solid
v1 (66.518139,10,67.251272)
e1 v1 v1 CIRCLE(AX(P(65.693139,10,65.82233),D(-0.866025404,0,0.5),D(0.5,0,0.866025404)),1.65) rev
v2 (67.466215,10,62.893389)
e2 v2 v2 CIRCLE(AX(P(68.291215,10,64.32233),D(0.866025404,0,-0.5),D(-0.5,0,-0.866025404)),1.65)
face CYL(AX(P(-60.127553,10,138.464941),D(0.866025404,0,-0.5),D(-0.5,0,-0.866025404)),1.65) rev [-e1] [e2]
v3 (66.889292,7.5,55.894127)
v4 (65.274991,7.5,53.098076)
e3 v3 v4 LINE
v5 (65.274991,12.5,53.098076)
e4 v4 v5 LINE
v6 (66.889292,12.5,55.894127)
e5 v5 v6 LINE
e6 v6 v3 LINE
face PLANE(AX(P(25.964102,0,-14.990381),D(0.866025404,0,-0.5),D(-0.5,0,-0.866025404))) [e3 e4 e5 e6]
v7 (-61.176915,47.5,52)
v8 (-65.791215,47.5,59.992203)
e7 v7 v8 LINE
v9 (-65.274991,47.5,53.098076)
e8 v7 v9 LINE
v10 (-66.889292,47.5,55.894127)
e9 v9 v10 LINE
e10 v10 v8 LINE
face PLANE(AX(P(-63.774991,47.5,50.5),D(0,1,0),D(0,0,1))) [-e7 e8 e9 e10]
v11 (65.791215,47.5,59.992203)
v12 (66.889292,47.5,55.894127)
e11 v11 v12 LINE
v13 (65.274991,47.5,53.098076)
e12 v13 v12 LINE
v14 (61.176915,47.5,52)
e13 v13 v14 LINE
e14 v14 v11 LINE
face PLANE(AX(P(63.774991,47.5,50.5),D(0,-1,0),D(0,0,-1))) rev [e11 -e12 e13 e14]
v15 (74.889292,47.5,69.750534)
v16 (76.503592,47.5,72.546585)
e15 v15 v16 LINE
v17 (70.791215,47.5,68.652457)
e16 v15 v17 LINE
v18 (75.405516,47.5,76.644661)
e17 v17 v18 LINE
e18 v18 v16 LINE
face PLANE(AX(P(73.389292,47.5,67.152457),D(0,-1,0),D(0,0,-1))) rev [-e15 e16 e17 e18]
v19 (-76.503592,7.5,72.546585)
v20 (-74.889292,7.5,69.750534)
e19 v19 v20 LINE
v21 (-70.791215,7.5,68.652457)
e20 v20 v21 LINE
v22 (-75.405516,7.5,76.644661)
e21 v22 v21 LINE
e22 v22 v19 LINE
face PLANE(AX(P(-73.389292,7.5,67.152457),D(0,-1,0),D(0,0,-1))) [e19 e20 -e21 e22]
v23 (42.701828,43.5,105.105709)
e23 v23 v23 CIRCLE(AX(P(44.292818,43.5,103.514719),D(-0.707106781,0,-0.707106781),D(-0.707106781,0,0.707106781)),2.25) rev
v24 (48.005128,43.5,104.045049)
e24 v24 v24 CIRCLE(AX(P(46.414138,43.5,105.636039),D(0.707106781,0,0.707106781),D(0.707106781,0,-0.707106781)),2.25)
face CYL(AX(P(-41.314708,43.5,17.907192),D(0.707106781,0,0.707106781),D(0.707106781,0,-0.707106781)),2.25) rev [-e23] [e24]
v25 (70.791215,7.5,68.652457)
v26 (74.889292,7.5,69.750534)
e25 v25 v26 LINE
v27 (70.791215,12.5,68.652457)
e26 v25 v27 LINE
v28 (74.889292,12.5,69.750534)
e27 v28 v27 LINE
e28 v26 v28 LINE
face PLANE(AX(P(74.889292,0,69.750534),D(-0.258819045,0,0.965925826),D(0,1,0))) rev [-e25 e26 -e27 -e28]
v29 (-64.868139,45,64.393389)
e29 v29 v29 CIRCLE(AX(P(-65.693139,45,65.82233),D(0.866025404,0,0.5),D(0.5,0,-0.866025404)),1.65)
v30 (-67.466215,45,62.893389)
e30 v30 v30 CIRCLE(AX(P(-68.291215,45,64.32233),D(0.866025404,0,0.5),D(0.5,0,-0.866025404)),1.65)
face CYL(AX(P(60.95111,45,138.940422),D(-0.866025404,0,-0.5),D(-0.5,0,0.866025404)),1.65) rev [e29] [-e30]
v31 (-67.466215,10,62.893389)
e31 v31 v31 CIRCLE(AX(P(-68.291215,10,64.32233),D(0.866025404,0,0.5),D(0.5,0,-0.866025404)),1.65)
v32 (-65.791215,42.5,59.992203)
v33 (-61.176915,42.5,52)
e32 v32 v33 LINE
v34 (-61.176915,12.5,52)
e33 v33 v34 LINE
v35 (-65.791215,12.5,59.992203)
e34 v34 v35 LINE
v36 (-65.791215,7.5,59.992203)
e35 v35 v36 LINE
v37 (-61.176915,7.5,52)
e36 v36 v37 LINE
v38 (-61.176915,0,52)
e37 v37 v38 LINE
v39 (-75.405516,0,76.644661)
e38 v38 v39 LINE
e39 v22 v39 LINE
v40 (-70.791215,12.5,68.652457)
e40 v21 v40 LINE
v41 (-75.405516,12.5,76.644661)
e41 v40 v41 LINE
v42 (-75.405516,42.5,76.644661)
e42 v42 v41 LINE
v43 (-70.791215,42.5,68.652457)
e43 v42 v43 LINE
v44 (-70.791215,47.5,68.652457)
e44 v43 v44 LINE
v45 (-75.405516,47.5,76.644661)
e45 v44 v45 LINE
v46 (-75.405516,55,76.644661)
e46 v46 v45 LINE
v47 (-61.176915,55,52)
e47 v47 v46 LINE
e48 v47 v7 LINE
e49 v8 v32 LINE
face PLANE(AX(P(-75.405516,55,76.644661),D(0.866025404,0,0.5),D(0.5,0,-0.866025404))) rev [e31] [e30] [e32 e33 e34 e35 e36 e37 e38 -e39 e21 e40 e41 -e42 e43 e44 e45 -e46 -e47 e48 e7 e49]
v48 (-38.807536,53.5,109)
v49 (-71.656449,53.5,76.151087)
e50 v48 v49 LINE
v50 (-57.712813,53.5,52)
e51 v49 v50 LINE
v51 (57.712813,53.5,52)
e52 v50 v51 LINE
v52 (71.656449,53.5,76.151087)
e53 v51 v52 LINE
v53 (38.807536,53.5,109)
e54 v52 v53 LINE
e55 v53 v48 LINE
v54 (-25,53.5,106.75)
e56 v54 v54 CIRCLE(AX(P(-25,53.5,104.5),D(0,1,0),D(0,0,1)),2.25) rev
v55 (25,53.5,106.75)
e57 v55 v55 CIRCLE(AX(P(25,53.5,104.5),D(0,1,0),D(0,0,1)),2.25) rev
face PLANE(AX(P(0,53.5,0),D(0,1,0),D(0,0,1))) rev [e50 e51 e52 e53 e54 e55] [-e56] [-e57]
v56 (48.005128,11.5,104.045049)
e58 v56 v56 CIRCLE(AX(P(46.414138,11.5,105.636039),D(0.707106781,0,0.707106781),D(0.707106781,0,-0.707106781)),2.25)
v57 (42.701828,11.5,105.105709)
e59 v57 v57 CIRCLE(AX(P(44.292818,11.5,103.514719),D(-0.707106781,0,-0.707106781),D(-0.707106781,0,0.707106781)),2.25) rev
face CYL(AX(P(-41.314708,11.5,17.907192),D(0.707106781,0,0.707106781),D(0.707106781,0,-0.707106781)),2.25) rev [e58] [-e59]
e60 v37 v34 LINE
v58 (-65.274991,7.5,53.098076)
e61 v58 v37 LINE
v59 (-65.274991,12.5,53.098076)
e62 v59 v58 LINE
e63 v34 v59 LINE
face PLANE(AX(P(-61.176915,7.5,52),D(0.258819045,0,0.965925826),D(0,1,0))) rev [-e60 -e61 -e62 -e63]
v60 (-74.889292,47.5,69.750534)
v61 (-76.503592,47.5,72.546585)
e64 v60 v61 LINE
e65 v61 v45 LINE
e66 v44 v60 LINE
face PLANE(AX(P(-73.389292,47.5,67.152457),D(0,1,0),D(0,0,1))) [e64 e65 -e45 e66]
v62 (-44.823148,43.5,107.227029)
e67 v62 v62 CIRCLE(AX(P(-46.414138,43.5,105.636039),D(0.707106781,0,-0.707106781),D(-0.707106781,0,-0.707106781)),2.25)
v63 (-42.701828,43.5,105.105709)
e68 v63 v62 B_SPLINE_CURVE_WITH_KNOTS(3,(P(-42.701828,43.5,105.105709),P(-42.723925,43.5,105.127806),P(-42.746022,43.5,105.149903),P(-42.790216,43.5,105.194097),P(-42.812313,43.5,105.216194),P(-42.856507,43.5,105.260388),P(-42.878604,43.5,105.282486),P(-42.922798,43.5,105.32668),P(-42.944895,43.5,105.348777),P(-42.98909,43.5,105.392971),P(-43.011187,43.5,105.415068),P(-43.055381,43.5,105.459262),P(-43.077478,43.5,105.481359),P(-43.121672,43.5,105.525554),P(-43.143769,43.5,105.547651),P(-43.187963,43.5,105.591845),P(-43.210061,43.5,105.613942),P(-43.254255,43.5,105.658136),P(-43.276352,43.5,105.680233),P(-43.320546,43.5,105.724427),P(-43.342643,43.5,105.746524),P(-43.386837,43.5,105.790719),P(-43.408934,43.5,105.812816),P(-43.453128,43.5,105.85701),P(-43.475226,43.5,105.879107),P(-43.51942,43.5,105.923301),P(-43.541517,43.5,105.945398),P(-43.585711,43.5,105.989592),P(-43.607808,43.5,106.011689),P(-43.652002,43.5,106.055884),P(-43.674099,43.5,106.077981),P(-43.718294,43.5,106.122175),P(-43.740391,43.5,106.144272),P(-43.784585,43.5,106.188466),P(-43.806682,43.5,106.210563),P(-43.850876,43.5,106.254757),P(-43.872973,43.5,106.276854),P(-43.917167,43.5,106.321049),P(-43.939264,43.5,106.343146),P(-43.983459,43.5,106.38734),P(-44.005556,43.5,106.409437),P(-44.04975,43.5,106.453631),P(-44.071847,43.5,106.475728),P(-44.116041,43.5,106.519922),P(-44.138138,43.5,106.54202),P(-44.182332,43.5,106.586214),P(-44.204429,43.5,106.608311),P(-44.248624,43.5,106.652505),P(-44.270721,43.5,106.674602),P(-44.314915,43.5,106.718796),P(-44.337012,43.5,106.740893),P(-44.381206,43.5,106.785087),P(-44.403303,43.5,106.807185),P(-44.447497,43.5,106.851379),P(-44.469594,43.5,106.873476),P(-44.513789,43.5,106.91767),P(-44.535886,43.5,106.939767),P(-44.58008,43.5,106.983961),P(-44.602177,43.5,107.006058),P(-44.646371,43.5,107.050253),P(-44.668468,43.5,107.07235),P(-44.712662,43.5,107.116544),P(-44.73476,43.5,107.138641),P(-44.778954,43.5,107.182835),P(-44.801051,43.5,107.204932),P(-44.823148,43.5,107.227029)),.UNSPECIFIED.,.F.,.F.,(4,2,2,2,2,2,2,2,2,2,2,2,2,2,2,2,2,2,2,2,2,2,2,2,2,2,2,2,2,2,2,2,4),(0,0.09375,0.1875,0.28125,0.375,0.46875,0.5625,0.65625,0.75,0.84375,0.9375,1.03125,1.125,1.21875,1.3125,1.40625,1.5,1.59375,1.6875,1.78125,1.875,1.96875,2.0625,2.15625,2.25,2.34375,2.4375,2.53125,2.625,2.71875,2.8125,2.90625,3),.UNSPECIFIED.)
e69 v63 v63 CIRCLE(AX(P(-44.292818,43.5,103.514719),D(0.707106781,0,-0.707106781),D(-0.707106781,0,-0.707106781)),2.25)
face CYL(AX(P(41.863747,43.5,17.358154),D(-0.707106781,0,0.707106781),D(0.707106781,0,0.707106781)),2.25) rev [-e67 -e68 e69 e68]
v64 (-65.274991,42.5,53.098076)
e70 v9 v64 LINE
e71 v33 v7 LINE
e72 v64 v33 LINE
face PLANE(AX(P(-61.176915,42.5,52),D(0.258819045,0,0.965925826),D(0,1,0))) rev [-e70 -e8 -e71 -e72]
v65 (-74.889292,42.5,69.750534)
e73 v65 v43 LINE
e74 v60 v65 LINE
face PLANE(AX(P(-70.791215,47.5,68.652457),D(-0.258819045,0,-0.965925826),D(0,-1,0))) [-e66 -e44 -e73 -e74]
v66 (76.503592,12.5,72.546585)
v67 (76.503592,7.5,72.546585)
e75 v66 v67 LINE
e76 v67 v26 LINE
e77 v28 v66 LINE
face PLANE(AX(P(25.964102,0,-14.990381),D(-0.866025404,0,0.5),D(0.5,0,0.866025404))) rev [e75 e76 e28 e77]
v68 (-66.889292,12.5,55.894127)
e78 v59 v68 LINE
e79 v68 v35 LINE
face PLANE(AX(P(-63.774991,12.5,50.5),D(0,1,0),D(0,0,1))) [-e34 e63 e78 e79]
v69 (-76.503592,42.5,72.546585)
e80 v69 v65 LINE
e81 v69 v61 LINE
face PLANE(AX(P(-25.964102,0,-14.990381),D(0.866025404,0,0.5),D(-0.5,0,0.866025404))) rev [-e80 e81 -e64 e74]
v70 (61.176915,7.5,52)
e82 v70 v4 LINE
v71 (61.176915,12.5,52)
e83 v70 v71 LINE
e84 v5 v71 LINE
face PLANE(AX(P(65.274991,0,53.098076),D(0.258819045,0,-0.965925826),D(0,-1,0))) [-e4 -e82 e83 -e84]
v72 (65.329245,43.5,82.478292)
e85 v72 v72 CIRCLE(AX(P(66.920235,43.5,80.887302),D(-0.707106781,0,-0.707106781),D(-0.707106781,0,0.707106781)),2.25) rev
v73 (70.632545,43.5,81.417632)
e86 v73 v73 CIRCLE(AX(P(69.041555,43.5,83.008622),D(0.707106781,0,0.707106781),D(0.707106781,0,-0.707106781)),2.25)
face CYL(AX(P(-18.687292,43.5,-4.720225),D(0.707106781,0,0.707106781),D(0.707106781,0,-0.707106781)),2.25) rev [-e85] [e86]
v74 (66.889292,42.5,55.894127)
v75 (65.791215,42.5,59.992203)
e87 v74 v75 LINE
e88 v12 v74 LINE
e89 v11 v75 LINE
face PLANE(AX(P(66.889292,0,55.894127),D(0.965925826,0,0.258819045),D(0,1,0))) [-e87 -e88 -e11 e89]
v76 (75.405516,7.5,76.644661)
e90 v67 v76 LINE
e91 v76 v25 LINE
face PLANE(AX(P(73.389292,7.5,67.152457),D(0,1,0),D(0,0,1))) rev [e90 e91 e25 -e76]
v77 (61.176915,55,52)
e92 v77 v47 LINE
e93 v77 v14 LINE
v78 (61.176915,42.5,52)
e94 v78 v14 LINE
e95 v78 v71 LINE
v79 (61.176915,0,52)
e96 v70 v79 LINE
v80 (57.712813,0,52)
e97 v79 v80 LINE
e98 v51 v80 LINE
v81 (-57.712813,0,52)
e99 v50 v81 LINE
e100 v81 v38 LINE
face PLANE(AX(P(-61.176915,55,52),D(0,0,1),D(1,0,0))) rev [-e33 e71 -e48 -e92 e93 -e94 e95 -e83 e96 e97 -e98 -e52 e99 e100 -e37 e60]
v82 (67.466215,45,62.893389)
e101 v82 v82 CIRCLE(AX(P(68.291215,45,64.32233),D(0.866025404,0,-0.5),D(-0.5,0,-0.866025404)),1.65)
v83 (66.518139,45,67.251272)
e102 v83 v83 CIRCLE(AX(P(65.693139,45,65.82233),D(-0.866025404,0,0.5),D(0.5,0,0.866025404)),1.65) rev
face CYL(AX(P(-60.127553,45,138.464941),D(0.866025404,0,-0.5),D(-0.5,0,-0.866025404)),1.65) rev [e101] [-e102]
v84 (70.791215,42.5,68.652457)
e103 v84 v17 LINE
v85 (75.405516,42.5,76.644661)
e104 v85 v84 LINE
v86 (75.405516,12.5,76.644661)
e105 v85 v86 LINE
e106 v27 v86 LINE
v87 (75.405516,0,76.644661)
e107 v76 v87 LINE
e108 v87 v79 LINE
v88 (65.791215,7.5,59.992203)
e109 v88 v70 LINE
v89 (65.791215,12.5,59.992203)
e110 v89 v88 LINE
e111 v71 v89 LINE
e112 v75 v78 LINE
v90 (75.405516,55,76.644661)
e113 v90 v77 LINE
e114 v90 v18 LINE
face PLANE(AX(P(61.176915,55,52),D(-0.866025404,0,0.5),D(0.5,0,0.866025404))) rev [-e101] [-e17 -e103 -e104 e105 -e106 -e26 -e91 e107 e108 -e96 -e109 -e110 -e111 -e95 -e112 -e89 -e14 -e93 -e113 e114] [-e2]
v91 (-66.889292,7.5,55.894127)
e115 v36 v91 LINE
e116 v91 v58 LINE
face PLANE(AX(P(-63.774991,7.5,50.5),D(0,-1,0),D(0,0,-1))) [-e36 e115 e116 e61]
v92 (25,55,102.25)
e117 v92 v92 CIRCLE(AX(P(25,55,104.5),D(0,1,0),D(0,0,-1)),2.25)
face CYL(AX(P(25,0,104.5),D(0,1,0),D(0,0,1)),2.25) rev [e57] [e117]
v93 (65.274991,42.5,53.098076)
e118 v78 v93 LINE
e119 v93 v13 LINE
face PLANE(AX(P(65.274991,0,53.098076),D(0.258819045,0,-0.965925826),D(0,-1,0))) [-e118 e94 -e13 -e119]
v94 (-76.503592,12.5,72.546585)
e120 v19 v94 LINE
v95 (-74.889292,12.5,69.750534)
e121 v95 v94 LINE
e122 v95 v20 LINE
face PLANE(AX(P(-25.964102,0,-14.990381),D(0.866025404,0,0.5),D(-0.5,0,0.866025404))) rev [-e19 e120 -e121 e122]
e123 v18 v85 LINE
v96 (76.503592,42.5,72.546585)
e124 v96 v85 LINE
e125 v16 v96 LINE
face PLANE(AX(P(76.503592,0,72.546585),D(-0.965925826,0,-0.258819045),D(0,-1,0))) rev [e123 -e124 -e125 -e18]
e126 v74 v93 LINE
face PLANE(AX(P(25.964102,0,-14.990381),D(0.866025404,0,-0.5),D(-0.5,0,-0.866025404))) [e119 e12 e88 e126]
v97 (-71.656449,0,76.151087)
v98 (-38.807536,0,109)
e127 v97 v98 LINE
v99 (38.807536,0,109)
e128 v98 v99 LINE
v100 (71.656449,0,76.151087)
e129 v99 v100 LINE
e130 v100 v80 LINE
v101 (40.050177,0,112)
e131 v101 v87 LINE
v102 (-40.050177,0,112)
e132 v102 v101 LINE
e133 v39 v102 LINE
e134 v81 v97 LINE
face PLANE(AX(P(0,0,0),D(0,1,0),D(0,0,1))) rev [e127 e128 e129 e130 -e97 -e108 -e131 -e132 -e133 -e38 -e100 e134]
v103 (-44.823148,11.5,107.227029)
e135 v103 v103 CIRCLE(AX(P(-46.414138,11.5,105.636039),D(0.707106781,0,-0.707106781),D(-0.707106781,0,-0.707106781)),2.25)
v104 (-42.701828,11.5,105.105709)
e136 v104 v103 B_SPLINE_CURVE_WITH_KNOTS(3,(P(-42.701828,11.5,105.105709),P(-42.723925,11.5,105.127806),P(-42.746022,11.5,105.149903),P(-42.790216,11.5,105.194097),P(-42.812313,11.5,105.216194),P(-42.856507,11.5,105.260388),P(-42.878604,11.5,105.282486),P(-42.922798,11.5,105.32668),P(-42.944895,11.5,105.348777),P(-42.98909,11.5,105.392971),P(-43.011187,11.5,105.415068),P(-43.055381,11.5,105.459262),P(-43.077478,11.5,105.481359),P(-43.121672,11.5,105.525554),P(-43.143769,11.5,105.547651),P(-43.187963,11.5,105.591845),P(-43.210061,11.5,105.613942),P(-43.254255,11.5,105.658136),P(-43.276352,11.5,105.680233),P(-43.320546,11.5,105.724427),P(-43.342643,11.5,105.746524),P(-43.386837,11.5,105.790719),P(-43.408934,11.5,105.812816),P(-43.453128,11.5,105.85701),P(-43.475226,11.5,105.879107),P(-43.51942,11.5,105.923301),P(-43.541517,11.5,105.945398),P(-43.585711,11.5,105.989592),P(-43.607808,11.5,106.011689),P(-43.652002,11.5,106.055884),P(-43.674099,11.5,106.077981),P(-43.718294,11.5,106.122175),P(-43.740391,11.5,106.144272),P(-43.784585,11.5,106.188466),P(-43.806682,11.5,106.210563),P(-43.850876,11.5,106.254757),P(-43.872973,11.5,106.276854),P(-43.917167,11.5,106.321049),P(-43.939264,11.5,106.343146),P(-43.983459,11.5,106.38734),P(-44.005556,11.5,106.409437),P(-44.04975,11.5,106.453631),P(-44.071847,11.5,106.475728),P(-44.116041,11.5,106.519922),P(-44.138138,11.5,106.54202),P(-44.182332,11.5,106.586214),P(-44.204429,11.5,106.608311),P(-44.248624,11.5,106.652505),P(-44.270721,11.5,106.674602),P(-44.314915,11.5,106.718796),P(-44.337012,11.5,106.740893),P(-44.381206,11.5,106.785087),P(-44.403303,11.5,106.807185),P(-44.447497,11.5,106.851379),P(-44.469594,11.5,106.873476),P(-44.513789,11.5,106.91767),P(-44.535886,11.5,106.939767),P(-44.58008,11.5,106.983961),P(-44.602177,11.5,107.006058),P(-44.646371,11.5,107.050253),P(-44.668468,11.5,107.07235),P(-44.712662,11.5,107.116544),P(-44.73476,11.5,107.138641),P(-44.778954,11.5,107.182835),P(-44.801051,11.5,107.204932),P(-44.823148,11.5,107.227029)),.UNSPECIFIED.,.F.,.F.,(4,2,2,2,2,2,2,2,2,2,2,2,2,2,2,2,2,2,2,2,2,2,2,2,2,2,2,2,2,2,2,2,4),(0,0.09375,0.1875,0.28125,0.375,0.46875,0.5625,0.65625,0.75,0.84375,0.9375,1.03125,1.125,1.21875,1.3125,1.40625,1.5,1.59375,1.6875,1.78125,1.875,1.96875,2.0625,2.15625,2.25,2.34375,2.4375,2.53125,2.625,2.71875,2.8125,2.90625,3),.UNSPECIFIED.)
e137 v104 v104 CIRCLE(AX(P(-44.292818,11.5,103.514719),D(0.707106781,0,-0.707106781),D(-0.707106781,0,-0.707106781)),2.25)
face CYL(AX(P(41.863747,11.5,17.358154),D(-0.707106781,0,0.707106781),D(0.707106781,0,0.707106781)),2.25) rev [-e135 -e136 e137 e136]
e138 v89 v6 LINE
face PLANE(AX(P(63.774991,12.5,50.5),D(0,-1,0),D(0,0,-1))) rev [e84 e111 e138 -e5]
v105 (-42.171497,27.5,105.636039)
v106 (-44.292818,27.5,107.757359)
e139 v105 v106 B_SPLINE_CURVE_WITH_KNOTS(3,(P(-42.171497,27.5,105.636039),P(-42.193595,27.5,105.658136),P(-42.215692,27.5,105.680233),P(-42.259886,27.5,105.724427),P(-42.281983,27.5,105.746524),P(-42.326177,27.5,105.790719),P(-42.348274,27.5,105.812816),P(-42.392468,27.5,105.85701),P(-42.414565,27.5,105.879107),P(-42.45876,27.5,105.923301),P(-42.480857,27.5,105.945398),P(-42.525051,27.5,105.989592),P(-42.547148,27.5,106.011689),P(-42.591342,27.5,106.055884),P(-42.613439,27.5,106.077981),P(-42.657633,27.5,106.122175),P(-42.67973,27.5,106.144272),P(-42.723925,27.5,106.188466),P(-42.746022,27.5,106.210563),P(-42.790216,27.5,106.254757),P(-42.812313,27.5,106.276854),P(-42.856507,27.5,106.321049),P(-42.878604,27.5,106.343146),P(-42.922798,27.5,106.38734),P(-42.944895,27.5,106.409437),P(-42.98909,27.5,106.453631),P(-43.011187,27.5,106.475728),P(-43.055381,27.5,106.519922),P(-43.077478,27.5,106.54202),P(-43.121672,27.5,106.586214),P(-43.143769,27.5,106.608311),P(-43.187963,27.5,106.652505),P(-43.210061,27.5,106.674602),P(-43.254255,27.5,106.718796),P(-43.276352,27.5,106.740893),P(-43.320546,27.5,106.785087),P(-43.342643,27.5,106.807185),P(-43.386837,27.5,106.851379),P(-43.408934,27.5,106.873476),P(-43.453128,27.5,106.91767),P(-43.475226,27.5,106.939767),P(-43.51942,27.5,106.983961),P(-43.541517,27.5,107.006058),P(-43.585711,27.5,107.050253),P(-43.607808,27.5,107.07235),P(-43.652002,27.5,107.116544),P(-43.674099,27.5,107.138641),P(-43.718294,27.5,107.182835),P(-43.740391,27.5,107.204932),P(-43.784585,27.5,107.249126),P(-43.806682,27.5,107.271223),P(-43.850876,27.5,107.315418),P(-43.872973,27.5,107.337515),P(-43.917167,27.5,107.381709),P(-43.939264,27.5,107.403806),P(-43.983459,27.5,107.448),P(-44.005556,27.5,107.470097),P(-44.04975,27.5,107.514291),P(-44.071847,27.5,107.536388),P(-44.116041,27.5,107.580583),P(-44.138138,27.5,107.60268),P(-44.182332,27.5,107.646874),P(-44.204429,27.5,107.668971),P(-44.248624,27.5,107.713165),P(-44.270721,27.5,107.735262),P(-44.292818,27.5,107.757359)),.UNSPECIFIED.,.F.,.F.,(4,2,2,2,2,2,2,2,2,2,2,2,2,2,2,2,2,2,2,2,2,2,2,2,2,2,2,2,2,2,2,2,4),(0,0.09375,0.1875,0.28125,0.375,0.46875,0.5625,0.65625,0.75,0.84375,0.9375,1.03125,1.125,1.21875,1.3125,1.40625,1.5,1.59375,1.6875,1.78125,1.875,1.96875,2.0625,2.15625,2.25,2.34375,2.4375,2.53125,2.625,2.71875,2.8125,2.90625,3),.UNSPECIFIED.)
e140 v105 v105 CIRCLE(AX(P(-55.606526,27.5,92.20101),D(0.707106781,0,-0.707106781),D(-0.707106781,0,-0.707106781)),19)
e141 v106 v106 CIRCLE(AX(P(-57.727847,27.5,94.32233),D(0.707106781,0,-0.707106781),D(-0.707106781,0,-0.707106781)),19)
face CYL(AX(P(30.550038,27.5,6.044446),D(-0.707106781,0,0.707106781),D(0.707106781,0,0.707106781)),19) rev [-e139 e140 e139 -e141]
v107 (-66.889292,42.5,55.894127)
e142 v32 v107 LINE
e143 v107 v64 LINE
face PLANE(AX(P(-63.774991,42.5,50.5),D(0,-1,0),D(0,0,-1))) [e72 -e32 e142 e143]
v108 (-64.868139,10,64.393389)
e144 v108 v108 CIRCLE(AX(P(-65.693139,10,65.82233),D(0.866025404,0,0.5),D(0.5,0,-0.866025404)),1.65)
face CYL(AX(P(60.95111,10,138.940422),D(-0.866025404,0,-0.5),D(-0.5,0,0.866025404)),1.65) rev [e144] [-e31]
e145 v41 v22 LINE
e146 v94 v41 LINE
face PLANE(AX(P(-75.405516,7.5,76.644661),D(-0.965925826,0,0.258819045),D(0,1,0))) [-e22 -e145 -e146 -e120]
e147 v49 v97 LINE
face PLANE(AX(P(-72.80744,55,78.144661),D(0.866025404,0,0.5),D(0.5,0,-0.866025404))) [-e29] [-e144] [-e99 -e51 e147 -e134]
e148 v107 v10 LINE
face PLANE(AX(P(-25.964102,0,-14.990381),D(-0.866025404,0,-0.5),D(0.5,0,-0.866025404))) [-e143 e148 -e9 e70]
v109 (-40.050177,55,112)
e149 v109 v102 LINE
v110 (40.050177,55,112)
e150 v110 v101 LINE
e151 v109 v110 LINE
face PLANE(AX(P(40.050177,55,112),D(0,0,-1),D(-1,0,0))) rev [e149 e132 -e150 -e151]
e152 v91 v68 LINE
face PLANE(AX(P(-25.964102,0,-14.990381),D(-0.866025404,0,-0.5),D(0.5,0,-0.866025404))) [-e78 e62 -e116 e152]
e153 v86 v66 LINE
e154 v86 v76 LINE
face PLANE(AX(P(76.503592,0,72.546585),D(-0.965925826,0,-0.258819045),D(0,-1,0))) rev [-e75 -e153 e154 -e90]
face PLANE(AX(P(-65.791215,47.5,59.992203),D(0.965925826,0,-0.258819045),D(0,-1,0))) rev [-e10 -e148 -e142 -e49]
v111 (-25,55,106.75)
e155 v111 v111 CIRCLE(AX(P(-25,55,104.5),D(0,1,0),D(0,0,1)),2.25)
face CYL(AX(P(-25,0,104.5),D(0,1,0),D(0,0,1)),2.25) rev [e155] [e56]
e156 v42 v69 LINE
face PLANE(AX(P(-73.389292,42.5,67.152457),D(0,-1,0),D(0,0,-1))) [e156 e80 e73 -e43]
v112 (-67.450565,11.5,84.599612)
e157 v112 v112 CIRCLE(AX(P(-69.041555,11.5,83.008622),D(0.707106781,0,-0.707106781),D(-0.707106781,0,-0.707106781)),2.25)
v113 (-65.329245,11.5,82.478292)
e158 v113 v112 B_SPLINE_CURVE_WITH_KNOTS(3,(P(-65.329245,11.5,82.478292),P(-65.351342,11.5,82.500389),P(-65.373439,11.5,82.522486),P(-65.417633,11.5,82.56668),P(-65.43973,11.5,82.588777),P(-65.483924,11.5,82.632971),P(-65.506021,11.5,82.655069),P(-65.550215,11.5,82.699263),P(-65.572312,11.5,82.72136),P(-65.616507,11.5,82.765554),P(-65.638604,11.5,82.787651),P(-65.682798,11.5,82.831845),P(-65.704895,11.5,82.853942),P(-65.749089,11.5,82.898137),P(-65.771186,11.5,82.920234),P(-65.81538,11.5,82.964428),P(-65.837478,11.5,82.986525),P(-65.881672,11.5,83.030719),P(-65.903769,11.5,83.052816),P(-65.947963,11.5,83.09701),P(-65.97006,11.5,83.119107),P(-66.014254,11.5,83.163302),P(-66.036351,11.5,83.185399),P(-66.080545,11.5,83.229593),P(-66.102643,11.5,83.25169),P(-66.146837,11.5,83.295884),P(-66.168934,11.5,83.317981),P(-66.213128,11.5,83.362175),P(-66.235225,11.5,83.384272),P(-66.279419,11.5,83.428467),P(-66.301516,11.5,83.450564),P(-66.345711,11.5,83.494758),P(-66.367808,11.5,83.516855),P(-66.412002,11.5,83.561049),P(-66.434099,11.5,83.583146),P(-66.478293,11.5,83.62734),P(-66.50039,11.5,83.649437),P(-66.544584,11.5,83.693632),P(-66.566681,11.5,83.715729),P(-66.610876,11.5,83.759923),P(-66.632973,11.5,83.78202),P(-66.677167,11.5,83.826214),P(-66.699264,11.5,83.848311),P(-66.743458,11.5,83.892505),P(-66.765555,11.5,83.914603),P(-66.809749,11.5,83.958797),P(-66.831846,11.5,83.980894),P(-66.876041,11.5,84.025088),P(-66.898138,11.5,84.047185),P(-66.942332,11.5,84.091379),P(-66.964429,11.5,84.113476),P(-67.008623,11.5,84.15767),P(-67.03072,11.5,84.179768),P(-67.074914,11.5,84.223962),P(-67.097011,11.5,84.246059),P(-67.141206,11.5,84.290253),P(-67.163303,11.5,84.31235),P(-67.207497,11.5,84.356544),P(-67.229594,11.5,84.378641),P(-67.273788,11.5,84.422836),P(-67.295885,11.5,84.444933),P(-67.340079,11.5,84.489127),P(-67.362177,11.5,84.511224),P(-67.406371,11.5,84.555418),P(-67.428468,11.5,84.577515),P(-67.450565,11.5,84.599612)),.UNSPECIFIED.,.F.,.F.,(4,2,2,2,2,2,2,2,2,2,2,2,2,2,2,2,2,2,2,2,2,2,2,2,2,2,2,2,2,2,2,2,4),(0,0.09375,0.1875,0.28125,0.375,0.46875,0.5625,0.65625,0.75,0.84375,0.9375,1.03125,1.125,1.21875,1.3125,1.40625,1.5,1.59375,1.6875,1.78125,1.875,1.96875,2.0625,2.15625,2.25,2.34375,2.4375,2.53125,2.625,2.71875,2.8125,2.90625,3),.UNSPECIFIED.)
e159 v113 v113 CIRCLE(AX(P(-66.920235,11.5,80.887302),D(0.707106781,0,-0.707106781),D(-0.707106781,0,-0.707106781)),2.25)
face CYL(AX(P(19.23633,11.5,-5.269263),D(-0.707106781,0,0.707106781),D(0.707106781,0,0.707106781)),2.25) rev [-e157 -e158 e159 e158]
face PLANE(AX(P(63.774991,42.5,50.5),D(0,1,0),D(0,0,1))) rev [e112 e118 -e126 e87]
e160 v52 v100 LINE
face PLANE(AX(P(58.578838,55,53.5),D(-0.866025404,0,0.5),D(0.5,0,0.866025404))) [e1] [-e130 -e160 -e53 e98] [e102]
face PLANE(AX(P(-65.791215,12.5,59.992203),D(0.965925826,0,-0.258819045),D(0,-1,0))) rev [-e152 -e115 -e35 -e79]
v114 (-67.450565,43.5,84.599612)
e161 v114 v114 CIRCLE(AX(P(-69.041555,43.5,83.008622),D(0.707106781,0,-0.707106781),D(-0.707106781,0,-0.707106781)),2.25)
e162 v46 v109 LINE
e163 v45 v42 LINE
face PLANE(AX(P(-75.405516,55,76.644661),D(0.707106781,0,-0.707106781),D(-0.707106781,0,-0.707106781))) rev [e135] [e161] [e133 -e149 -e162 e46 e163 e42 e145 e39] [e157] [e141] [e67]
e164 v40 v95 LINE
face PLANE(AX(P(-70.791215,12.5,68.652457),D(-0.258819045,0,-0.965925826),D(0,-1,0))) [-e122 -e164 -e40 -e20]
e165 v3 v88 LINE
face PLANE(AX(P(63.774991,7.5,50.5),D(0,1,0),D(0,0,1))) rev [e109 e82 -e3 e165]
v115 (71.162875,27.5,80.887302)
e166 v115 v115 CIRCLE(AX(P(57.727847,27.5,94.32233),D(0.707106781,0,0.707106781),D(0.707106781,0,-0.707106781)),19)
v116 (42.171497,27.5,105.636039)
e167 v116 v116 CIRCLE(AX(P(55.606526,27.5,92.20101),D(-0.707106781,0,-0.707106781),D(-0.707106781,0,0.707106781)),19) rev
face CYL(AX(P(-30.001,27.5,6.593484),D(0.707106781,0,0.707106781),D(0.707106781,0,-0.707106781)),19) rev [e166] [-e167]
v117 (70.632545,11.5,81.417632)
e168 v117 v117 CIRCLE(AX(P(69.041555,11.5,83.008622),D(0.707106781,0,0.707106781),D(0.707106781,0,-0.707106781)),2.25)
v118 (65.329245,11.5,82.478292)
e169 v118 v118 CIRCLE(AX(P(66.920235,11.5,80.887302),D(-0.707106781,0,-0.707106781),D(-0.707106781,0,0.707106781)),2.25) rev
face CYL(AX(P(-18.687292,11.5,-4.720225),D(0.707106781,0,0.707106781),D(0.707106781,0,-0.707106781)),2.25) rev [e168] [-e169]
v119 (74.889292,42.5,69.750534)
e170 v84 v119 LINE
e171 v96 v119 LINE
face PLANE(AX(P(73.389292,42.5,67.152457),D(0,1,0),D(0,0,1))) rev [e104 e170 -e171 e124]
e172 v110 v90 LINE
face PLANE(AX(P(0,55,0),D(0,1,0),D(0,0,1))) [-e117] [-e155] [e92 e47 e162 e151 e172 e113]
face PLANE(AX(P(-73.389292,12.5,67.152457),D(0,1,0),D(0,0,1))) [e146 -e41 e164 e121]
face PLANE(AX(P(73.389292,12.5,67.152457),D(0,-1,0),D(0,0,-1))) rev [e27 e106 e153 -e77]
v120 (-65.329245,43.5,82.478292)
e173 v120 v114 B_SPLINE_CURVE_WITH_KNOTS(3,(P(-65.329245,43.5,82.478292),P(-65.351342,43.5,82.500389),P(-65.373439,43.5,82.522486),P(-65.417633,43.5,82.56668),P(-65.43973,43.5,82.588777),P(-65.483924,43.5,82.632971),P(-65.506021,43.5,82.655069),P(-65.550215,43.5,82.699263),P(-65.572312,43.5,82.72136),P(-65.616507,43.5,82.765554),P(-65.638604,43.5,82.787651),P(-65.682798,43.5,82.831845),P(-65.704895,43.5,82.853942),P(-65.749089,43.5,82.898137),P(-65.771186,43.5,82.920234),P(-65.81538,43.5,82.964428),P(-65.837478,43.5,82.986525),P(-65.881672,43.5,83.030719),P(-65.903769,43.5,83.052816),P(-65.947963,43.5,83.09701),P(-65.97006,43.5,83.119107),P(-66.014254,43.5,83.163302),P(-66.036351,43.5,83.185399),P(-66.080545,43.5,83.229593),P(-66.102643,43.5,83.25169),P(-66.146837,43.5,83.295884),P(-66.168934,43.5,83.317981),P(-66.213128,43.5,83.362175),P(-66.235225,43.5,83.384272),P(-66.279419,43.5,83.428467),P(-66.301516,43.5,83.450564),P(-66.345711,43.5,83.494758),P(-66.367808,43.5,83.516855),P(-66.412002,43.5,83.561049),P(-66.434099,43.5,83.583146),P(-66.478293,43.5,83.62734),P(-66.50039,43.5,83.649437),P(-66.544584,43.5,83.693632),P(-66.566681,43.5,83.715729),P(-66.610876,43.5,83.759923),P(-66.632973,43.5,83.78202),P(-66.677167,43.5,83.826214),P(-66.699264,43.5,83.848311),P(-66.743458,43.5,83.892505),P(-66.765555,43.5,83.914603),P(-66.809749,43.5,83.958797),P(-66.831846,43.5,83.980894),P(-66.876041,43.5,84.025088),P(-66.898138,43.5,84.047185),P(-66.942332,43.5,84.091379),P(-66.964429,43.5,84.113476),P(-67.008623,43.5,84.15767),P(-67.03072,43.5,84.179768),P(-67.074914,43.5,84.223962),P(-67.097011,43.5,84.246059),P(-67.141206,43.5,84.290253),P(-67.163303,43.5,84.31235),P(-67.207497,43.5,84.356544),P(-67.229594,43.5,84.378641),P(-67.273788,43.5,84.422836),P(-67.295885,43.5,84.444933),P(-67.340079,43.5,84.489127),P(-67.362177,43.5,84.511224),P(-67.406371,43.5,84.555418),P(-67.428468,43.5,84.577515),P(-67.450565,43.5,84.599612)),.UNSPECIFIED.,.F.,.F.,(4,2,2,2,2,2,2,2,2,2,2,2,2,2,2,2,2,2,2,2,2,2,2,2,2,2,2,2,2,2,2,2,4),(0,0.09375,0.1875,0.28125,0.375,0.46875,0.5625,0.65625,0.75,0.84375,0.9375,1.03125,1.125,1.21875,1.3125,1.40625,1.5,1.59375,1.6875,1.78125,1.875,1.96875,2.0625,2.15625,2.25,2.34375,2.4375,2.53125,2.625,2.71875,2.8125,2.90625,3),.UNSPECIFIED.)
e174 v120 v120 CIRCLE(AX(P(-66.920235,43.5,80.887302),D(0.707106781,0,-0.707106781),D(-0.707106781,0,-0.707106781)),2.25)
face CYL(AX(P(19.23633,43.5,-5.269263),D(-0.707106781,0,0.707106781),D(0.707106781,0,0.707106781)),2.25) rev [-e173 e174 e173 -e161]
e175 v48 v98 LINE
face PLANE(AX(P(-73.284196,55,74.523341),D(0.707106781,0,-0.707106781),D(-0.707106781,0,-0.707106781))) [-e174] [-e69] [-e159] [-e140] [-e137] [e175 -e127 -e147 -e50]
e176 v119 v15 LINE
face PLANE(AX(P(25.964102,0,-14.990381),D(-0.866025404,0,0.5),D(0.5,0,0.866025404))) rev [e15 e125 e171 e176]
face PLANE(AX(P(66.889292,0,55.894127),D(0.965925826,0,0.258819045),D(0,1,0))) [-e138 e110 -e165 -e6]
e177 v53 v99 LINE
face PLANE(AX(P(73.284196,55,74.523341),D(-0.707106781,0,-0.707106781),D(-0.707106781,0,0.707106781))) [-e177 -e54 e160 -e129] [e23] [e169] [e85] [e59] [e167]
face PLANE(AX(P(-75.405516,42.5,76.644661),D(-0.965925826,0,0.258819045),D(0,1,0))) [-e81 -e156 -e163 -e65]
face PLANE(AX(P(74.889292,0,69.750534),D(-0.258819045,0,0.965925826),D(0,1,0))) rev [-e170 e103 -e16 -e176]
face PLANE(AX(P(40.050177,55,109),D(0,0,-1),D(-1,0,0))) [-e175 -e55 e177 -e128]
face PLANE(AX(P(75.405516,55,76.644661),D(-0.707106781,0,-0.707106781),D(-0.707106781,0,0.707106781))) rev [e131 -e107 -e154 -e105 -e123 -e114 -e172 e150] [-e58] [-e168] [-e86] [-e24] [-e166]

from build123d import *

# Parameters (mm, degrees)
BOSS_EXTRUDE1_DEPTH      = 55
SHELL1_T                 = -3
CUT_EXTRUDE1_REACH       = 167.077
SKETCH2_R                = 19
SKETCH2_R_2              = 2.25
CUT_EXTRUDE2_REACH       = 170.904
SKETCH3_R                = 1.65
SKETCH4_W                = 9.228601628
SKETCH4_H                = 5
BOSS_EXTRUDE2_DEPTH      = 3
CHAMFER1_SIZE            = 3
CHAMFER1_OF_MIRROR2_SIZE = 3
SKETCH5_R                = 2.25
CUT_EXTRUDE3_DEPTH       = 147.36190521
CUT_EXTRUDE4_DEPTH       = 1.5


with BuildPart() as part:
    # Sketch1 → Boss-Extrude1 (new body)
    with BuildSketch(Plane(origin=(0, 0, 0), x_dir=(1, 0, 0), z_dir=(0, 1, 0))):
        Polygon((40.050177105, -112), (-40.050177105, -112), (-75.405516164, -76.644660941), (-61.176914536, -52), (61.176914536, -52), (75.405516164, -76.644660941), align=None)
    extrude(amount=BOSS_EXTRUDE1_DEPTH)

    # Shell1
    shell1_openings = [part.faces().sort_by_distance(p)[0] for p in [
        (0, 27.5, 52),
        (0, 0, 79.968655268),
    ]]
    offset(amount=SHELL1_T, openings=shell1_openings, kind=Kind.INTERSECTION)

    # Sketch2 → Cut-Extrude1 (cut, up to next)
    with BuildSketch(Plane(origin=(76.025088553, 0, 76.025088553), x_dir=(0.7071067811865462, 0, -0.7071067811865488), z_dir=(0.7071067811865488, 0, 0.7071067811865462)), mode=Mode.PRIVATE) as cut_extrude1_sk1:
        with Locations((-25.876207674, 27.5)):
            Circle(SKETCH2_R)
    cut_extrude1_tool1 = extrude(cut_extrude1_sk1.sketch, amount=-CUT_EXTRUDE1_REACH, mode=Mode.PRIVATE) & part.part
    # Sketch2 → Cut-Extrude1 (cut, up to next)
    with BuildSketch(Plane(origin=(76.025088553, 0, 76.025088553), x_dir=(0.7071067811865462, 0, -0.7071067811865488), z_dir=(0.7071067811865488, 0, 0.7071067811865462)), mode=Mode.PRIVATE) as cut_extrude1_sk2:
        with Locations((-41.876207674, 11.5)):
            Circle(SKETCH2_R_2)
    cut_extrude1_tool2 = extrude(cut_extrude1_sk2.sketch, amount=-CUT_EXTRUDE1_REACH, mode=Mode.PRIVATE) & part.part
    # Sketch2 → Cut-Extrude1 (cut, up to next)
    with BuildSketch(Plane(origin=(76.025088553, 0, 76.025088553), x_dir=(0.7071067811865462, 0, -0.7071067811865488), z_dir=(0.7071067811865488, 0, 0.7071067811865462)), mode=Mode.PRIVATE) as cut_extrude1_sk3:
        with Locations((-9.876207674, 11.5)):
            Circle(SKETCH2_R_2)
    cut_extrude1_tool3 = extrude(cut_extrude1_sk3.sketch, amount=-CUT_EXTRUDE1_REACH, mode=Mode.PRIVATE) & part.part
    # Sketch2 → Cut-Extrude1 (cut, up to next)
    with BuildSketch(Plane(origin=(76.025088553, 0, 76.025088553), x_dir=(0.7071067811865462, 0, -0.7071067811865488), z_dir=(0.7071067811865488, 0, 0.7071067811865462)), mode=Mode.PRIVATE) as cut_extrude1_sk4:
        with Locations((-9.876207674, 43.5)):
            Circle(SKETCH2_R_2)
    cut_extrude1_tool4 = extrude(cut_extrude1_sk4.sketch, amount=-CUT_EXTRUDE1_REACH, mode=Mode.PRIVATE) & part.part
    # Sketch2 → Cut-Extrude1 (cut, up to next)
    with BuildSketch(Plane(origin=(76.025088553, 0, 76.025088553), x_dir=(0.7071067811865462, 0, -0.7071067811865488), z_dir=(0.7071067811865488, 0, 0.7071067811865462)), mode=Mode.PRIVATE) as cut_extrude1_sk5:
        with Locations((-41.876207674, 43.5)):
            Circle(SKETCH2_R_2)
    cut_extrude1_tool5 = extrude(cut_extrude1_sk5.sketch, amount=-CUT_EXTRUDE1_REACH, mode=Mode.PRIVATE) & part.part
    cut_extrude1_1 = cut_extrude1_tool1.solids().sort_by_distance((57.727847, 27.5, 94.32233))[0]
    add(cut_extrude1_1, mode=Mode.SUBTRACT)
    cut_extrude1_2 = cut_extrude1_tool2.solids().sort_by_distance((46.414138, 11.5, 105.636039))[0]
    add(cut_extrude1_2, mode=Mode.SUBTRACT)
    cut_extrude1_3 = cut_extrude1_tool3.solids().sort_by_distance((69.041555, 11.5, 83.008622))[0]
    add(cut_extrude1_3, mode=Mode.SUBTRACT)
    cut_extrude1_4 = cut_extrude1_tool4.solids().sort_by_distance((69.041555, 43.5, 83.008622))[0]
    add(cut_extrude1_4, mode=Mode.SUBTRACT)
    cut_extrude1_5 = cut_extrude1_tool5.solids().sort_by_distance((46.414138, 43.5, 105.636039))[0]
    add(cut_extrude1_5, mode=Mode.SUBTRACT)
    cut_extrude1 = cut_extrude1_1 + cut_extrude1_2 + cut_extrude1_3 + cut_extrude1_4 + cut_extrude1_5  # Cut-Extrude1 as one shape, for the pattern or mirror that repeats it

    # Sketch3 → Cut-Extrude2 (cut, up to next)
    with BuildSketch(Plane(origin=(23.366025404, 0, -13.490381057), x_dir=(-0.5000000000000074, 0, -0.8660254037844345), z_dir=(0.8660254037844344, 0, -0.5000000000000073)), mode=Mode.PRIVATE) as cut_extrude2_sk1:
        with Locations((-89.850379893, 10)):
            Circle(SKETCH3_R)
    cut_extrude2_tool1 = extrude(cut_extrude2_sk1.sketch, amount=-CUT_EXTRUDE2_REACH, mode=Mode.PRIVATE) & part.part
    # Sketch3 → Cut-Extrude2 (cut, up to next)
    with BuildSketch(Plane(origin=(23.366025404, 0, -13.490381057), x_dir=(-0.5000000000000074, 0, -0.8660254037844345), z_dir=(0.8660254037844344, 0, -0.5000000000000073)), mode=Mode.PRIVATE) as cut_extrude2_sk2:
        with Locations((-89.850379893, 45)):
            Circle(SKETCH3_R)
    cut_extrude2_tool2 = extrude(cut_extrude2_sk2.sketch, amount=-CUT_EXTRUDE2_REACH, mode=Mode.PRIVATE) & part.part
    cut_extrude2_1 = cut_extrude2_tool1.solids().sort_by_distance((68.291215, 10, 64.32233))[0]
    add(cut_extrude2_1, mode=Mode.SUBTRACT)
    cut_extrude2_2 = cut_extrude2_tool2.solids().sort_by_distance((68.291215, 45, 64.32233))[0]
    add(cut_extrude2_2, mode=Mode.SUBTRACT)
    cut_extrude2 = cut_extrude2_1 + cut_extrude2_2  # Cut-Extrude2 as one shape, for the pattern or mirror that repeats it

    # Sketch4 → Boss-Extrude2 (add)
    with BuildSketch(Plane(origin=(23.366025404, 0, -13.490381057), x_dir=(-0.5000000000000074, 0, -0.8660254037844345), z_dir=(0.8660254037844344, 0, -0.5000000000000073))):
        with Locations((-80.236079079, 10)):
            Rectangle(SKETCH4_W, SKETCH4_H)
        with Locations((-99.464680707, 10)):
            Rectangle(SKETCH4_W, SKETCH4_H)
        with Locations((-80.236079079, 45)):
            Rectangle(SKETCH4_W, SKETCH4_H)
        with Locations((-99.464680707, 45)):
            Rectangle(SKETCH4_W, SKETCH4_H)
    boss_extrude2 = extrude(amount=BOSS_EXTRUDE2_DEPTH)

    # Chamfer1
    chamfer1_edges = [part.edges().sort_by_distance(p)[0] for p in [
        (63.774990748, 10, 50.5),
        (63.774990748, 45, 50.5),
        (68.389291562, 45, 58.492203451),
        (68.389291562, 10, 58.492203451),
        (73.389291562, 10, 67.152457489),
        (73.389291562, 45, 67.152457489),
        (78.003592376, 10, 75.144660941),
        (78.003592376, 45, 75.144660941),
    ]]
    chamfer(chamfer1_edges, length=CHAMFER1_SIZE - 0.0001)  # a hair under: the kernel refuses the full size

    # Mirror2: Cut-Extrude1, Cut-Extrude2, Boss-Extrude2 across plane
    add(cut_extrude1.mirror(Plane(origin=(0, 0, 0), x_dir=(0, 0, 1), z_dir=(1, 0, 0))), mode=Mode.SUBTRACT)
    add(cut_extrude2.mirror(Plane(origin=(0, 0, 0), x_dir=(0, 0, 1), z_dir=(1, 0, 0))), mode=Mode.SUBTRACT)
    add(boss_extrude2.mirror(Plane(origin=(0, 0, 0), x_dir=(0, 0, 1), z_dir=(1, 0, 0))))

    # Chamfer1 of Mirror2
    chamfer1_of_mirror2_edges = [part.edges().sort_by_distance(p)[0] for p in [
        (-63.774990748, 10, 50.5),
        (-63.774990748, 45, 50.5),
        (-68.389291562, 45, 58.492203451),
        (-68.389291562, 10, 58.492203451),
        (-73.389291562, 10, 67.152457489),
        (-73.389291562, 45, 67.152457489),
        (-78.003592376, 10, 75.144660941),
        (-78.003592376, 45, 75.144660941),
    ]]
    chamfer(chamfer1_of_mirror2_edges, length=CHAMFER1_OF_MIRROR2_SIZE - 0.0001)  # a hair under: the kernel refuses the full size

    # Sketch5 → Cut-Extrude3 (cut, through all)
    with BuildSketch(Plane(origin=(0, 55, 0), x_dir=(1, 0, 0), z_dir=(0, 1, 0))):
        with Locations(Location((-25, -104.5, 0), (0, 0, 270))):
            Circle(SKETCH5_R)
        with Locations(Location((25, -104.5, 0), (0, 0, 270))):
            Circle(SKETCH5_R)
    extrude(amount=-CUT_EXTRUDE3_DEPTH, mode=Mode.SUBTRACT)

    # Sketch6 → Cut-Extrude4 (cut)
    with BuildSketch(Plane.XZ.offset(-52)):
        Polygon((-57.712812921, 52), (57.712812921, 52), (71.656449471, 76.151086947), (38.807536418, 109), (-38.807536418, 109), (-71.656449471, 76.151086947), align=None)
    extrude(amount=-CUT_EXTRUDE4_DEPTH, mode=Mode.SUBTRACT)


solid = part.part
